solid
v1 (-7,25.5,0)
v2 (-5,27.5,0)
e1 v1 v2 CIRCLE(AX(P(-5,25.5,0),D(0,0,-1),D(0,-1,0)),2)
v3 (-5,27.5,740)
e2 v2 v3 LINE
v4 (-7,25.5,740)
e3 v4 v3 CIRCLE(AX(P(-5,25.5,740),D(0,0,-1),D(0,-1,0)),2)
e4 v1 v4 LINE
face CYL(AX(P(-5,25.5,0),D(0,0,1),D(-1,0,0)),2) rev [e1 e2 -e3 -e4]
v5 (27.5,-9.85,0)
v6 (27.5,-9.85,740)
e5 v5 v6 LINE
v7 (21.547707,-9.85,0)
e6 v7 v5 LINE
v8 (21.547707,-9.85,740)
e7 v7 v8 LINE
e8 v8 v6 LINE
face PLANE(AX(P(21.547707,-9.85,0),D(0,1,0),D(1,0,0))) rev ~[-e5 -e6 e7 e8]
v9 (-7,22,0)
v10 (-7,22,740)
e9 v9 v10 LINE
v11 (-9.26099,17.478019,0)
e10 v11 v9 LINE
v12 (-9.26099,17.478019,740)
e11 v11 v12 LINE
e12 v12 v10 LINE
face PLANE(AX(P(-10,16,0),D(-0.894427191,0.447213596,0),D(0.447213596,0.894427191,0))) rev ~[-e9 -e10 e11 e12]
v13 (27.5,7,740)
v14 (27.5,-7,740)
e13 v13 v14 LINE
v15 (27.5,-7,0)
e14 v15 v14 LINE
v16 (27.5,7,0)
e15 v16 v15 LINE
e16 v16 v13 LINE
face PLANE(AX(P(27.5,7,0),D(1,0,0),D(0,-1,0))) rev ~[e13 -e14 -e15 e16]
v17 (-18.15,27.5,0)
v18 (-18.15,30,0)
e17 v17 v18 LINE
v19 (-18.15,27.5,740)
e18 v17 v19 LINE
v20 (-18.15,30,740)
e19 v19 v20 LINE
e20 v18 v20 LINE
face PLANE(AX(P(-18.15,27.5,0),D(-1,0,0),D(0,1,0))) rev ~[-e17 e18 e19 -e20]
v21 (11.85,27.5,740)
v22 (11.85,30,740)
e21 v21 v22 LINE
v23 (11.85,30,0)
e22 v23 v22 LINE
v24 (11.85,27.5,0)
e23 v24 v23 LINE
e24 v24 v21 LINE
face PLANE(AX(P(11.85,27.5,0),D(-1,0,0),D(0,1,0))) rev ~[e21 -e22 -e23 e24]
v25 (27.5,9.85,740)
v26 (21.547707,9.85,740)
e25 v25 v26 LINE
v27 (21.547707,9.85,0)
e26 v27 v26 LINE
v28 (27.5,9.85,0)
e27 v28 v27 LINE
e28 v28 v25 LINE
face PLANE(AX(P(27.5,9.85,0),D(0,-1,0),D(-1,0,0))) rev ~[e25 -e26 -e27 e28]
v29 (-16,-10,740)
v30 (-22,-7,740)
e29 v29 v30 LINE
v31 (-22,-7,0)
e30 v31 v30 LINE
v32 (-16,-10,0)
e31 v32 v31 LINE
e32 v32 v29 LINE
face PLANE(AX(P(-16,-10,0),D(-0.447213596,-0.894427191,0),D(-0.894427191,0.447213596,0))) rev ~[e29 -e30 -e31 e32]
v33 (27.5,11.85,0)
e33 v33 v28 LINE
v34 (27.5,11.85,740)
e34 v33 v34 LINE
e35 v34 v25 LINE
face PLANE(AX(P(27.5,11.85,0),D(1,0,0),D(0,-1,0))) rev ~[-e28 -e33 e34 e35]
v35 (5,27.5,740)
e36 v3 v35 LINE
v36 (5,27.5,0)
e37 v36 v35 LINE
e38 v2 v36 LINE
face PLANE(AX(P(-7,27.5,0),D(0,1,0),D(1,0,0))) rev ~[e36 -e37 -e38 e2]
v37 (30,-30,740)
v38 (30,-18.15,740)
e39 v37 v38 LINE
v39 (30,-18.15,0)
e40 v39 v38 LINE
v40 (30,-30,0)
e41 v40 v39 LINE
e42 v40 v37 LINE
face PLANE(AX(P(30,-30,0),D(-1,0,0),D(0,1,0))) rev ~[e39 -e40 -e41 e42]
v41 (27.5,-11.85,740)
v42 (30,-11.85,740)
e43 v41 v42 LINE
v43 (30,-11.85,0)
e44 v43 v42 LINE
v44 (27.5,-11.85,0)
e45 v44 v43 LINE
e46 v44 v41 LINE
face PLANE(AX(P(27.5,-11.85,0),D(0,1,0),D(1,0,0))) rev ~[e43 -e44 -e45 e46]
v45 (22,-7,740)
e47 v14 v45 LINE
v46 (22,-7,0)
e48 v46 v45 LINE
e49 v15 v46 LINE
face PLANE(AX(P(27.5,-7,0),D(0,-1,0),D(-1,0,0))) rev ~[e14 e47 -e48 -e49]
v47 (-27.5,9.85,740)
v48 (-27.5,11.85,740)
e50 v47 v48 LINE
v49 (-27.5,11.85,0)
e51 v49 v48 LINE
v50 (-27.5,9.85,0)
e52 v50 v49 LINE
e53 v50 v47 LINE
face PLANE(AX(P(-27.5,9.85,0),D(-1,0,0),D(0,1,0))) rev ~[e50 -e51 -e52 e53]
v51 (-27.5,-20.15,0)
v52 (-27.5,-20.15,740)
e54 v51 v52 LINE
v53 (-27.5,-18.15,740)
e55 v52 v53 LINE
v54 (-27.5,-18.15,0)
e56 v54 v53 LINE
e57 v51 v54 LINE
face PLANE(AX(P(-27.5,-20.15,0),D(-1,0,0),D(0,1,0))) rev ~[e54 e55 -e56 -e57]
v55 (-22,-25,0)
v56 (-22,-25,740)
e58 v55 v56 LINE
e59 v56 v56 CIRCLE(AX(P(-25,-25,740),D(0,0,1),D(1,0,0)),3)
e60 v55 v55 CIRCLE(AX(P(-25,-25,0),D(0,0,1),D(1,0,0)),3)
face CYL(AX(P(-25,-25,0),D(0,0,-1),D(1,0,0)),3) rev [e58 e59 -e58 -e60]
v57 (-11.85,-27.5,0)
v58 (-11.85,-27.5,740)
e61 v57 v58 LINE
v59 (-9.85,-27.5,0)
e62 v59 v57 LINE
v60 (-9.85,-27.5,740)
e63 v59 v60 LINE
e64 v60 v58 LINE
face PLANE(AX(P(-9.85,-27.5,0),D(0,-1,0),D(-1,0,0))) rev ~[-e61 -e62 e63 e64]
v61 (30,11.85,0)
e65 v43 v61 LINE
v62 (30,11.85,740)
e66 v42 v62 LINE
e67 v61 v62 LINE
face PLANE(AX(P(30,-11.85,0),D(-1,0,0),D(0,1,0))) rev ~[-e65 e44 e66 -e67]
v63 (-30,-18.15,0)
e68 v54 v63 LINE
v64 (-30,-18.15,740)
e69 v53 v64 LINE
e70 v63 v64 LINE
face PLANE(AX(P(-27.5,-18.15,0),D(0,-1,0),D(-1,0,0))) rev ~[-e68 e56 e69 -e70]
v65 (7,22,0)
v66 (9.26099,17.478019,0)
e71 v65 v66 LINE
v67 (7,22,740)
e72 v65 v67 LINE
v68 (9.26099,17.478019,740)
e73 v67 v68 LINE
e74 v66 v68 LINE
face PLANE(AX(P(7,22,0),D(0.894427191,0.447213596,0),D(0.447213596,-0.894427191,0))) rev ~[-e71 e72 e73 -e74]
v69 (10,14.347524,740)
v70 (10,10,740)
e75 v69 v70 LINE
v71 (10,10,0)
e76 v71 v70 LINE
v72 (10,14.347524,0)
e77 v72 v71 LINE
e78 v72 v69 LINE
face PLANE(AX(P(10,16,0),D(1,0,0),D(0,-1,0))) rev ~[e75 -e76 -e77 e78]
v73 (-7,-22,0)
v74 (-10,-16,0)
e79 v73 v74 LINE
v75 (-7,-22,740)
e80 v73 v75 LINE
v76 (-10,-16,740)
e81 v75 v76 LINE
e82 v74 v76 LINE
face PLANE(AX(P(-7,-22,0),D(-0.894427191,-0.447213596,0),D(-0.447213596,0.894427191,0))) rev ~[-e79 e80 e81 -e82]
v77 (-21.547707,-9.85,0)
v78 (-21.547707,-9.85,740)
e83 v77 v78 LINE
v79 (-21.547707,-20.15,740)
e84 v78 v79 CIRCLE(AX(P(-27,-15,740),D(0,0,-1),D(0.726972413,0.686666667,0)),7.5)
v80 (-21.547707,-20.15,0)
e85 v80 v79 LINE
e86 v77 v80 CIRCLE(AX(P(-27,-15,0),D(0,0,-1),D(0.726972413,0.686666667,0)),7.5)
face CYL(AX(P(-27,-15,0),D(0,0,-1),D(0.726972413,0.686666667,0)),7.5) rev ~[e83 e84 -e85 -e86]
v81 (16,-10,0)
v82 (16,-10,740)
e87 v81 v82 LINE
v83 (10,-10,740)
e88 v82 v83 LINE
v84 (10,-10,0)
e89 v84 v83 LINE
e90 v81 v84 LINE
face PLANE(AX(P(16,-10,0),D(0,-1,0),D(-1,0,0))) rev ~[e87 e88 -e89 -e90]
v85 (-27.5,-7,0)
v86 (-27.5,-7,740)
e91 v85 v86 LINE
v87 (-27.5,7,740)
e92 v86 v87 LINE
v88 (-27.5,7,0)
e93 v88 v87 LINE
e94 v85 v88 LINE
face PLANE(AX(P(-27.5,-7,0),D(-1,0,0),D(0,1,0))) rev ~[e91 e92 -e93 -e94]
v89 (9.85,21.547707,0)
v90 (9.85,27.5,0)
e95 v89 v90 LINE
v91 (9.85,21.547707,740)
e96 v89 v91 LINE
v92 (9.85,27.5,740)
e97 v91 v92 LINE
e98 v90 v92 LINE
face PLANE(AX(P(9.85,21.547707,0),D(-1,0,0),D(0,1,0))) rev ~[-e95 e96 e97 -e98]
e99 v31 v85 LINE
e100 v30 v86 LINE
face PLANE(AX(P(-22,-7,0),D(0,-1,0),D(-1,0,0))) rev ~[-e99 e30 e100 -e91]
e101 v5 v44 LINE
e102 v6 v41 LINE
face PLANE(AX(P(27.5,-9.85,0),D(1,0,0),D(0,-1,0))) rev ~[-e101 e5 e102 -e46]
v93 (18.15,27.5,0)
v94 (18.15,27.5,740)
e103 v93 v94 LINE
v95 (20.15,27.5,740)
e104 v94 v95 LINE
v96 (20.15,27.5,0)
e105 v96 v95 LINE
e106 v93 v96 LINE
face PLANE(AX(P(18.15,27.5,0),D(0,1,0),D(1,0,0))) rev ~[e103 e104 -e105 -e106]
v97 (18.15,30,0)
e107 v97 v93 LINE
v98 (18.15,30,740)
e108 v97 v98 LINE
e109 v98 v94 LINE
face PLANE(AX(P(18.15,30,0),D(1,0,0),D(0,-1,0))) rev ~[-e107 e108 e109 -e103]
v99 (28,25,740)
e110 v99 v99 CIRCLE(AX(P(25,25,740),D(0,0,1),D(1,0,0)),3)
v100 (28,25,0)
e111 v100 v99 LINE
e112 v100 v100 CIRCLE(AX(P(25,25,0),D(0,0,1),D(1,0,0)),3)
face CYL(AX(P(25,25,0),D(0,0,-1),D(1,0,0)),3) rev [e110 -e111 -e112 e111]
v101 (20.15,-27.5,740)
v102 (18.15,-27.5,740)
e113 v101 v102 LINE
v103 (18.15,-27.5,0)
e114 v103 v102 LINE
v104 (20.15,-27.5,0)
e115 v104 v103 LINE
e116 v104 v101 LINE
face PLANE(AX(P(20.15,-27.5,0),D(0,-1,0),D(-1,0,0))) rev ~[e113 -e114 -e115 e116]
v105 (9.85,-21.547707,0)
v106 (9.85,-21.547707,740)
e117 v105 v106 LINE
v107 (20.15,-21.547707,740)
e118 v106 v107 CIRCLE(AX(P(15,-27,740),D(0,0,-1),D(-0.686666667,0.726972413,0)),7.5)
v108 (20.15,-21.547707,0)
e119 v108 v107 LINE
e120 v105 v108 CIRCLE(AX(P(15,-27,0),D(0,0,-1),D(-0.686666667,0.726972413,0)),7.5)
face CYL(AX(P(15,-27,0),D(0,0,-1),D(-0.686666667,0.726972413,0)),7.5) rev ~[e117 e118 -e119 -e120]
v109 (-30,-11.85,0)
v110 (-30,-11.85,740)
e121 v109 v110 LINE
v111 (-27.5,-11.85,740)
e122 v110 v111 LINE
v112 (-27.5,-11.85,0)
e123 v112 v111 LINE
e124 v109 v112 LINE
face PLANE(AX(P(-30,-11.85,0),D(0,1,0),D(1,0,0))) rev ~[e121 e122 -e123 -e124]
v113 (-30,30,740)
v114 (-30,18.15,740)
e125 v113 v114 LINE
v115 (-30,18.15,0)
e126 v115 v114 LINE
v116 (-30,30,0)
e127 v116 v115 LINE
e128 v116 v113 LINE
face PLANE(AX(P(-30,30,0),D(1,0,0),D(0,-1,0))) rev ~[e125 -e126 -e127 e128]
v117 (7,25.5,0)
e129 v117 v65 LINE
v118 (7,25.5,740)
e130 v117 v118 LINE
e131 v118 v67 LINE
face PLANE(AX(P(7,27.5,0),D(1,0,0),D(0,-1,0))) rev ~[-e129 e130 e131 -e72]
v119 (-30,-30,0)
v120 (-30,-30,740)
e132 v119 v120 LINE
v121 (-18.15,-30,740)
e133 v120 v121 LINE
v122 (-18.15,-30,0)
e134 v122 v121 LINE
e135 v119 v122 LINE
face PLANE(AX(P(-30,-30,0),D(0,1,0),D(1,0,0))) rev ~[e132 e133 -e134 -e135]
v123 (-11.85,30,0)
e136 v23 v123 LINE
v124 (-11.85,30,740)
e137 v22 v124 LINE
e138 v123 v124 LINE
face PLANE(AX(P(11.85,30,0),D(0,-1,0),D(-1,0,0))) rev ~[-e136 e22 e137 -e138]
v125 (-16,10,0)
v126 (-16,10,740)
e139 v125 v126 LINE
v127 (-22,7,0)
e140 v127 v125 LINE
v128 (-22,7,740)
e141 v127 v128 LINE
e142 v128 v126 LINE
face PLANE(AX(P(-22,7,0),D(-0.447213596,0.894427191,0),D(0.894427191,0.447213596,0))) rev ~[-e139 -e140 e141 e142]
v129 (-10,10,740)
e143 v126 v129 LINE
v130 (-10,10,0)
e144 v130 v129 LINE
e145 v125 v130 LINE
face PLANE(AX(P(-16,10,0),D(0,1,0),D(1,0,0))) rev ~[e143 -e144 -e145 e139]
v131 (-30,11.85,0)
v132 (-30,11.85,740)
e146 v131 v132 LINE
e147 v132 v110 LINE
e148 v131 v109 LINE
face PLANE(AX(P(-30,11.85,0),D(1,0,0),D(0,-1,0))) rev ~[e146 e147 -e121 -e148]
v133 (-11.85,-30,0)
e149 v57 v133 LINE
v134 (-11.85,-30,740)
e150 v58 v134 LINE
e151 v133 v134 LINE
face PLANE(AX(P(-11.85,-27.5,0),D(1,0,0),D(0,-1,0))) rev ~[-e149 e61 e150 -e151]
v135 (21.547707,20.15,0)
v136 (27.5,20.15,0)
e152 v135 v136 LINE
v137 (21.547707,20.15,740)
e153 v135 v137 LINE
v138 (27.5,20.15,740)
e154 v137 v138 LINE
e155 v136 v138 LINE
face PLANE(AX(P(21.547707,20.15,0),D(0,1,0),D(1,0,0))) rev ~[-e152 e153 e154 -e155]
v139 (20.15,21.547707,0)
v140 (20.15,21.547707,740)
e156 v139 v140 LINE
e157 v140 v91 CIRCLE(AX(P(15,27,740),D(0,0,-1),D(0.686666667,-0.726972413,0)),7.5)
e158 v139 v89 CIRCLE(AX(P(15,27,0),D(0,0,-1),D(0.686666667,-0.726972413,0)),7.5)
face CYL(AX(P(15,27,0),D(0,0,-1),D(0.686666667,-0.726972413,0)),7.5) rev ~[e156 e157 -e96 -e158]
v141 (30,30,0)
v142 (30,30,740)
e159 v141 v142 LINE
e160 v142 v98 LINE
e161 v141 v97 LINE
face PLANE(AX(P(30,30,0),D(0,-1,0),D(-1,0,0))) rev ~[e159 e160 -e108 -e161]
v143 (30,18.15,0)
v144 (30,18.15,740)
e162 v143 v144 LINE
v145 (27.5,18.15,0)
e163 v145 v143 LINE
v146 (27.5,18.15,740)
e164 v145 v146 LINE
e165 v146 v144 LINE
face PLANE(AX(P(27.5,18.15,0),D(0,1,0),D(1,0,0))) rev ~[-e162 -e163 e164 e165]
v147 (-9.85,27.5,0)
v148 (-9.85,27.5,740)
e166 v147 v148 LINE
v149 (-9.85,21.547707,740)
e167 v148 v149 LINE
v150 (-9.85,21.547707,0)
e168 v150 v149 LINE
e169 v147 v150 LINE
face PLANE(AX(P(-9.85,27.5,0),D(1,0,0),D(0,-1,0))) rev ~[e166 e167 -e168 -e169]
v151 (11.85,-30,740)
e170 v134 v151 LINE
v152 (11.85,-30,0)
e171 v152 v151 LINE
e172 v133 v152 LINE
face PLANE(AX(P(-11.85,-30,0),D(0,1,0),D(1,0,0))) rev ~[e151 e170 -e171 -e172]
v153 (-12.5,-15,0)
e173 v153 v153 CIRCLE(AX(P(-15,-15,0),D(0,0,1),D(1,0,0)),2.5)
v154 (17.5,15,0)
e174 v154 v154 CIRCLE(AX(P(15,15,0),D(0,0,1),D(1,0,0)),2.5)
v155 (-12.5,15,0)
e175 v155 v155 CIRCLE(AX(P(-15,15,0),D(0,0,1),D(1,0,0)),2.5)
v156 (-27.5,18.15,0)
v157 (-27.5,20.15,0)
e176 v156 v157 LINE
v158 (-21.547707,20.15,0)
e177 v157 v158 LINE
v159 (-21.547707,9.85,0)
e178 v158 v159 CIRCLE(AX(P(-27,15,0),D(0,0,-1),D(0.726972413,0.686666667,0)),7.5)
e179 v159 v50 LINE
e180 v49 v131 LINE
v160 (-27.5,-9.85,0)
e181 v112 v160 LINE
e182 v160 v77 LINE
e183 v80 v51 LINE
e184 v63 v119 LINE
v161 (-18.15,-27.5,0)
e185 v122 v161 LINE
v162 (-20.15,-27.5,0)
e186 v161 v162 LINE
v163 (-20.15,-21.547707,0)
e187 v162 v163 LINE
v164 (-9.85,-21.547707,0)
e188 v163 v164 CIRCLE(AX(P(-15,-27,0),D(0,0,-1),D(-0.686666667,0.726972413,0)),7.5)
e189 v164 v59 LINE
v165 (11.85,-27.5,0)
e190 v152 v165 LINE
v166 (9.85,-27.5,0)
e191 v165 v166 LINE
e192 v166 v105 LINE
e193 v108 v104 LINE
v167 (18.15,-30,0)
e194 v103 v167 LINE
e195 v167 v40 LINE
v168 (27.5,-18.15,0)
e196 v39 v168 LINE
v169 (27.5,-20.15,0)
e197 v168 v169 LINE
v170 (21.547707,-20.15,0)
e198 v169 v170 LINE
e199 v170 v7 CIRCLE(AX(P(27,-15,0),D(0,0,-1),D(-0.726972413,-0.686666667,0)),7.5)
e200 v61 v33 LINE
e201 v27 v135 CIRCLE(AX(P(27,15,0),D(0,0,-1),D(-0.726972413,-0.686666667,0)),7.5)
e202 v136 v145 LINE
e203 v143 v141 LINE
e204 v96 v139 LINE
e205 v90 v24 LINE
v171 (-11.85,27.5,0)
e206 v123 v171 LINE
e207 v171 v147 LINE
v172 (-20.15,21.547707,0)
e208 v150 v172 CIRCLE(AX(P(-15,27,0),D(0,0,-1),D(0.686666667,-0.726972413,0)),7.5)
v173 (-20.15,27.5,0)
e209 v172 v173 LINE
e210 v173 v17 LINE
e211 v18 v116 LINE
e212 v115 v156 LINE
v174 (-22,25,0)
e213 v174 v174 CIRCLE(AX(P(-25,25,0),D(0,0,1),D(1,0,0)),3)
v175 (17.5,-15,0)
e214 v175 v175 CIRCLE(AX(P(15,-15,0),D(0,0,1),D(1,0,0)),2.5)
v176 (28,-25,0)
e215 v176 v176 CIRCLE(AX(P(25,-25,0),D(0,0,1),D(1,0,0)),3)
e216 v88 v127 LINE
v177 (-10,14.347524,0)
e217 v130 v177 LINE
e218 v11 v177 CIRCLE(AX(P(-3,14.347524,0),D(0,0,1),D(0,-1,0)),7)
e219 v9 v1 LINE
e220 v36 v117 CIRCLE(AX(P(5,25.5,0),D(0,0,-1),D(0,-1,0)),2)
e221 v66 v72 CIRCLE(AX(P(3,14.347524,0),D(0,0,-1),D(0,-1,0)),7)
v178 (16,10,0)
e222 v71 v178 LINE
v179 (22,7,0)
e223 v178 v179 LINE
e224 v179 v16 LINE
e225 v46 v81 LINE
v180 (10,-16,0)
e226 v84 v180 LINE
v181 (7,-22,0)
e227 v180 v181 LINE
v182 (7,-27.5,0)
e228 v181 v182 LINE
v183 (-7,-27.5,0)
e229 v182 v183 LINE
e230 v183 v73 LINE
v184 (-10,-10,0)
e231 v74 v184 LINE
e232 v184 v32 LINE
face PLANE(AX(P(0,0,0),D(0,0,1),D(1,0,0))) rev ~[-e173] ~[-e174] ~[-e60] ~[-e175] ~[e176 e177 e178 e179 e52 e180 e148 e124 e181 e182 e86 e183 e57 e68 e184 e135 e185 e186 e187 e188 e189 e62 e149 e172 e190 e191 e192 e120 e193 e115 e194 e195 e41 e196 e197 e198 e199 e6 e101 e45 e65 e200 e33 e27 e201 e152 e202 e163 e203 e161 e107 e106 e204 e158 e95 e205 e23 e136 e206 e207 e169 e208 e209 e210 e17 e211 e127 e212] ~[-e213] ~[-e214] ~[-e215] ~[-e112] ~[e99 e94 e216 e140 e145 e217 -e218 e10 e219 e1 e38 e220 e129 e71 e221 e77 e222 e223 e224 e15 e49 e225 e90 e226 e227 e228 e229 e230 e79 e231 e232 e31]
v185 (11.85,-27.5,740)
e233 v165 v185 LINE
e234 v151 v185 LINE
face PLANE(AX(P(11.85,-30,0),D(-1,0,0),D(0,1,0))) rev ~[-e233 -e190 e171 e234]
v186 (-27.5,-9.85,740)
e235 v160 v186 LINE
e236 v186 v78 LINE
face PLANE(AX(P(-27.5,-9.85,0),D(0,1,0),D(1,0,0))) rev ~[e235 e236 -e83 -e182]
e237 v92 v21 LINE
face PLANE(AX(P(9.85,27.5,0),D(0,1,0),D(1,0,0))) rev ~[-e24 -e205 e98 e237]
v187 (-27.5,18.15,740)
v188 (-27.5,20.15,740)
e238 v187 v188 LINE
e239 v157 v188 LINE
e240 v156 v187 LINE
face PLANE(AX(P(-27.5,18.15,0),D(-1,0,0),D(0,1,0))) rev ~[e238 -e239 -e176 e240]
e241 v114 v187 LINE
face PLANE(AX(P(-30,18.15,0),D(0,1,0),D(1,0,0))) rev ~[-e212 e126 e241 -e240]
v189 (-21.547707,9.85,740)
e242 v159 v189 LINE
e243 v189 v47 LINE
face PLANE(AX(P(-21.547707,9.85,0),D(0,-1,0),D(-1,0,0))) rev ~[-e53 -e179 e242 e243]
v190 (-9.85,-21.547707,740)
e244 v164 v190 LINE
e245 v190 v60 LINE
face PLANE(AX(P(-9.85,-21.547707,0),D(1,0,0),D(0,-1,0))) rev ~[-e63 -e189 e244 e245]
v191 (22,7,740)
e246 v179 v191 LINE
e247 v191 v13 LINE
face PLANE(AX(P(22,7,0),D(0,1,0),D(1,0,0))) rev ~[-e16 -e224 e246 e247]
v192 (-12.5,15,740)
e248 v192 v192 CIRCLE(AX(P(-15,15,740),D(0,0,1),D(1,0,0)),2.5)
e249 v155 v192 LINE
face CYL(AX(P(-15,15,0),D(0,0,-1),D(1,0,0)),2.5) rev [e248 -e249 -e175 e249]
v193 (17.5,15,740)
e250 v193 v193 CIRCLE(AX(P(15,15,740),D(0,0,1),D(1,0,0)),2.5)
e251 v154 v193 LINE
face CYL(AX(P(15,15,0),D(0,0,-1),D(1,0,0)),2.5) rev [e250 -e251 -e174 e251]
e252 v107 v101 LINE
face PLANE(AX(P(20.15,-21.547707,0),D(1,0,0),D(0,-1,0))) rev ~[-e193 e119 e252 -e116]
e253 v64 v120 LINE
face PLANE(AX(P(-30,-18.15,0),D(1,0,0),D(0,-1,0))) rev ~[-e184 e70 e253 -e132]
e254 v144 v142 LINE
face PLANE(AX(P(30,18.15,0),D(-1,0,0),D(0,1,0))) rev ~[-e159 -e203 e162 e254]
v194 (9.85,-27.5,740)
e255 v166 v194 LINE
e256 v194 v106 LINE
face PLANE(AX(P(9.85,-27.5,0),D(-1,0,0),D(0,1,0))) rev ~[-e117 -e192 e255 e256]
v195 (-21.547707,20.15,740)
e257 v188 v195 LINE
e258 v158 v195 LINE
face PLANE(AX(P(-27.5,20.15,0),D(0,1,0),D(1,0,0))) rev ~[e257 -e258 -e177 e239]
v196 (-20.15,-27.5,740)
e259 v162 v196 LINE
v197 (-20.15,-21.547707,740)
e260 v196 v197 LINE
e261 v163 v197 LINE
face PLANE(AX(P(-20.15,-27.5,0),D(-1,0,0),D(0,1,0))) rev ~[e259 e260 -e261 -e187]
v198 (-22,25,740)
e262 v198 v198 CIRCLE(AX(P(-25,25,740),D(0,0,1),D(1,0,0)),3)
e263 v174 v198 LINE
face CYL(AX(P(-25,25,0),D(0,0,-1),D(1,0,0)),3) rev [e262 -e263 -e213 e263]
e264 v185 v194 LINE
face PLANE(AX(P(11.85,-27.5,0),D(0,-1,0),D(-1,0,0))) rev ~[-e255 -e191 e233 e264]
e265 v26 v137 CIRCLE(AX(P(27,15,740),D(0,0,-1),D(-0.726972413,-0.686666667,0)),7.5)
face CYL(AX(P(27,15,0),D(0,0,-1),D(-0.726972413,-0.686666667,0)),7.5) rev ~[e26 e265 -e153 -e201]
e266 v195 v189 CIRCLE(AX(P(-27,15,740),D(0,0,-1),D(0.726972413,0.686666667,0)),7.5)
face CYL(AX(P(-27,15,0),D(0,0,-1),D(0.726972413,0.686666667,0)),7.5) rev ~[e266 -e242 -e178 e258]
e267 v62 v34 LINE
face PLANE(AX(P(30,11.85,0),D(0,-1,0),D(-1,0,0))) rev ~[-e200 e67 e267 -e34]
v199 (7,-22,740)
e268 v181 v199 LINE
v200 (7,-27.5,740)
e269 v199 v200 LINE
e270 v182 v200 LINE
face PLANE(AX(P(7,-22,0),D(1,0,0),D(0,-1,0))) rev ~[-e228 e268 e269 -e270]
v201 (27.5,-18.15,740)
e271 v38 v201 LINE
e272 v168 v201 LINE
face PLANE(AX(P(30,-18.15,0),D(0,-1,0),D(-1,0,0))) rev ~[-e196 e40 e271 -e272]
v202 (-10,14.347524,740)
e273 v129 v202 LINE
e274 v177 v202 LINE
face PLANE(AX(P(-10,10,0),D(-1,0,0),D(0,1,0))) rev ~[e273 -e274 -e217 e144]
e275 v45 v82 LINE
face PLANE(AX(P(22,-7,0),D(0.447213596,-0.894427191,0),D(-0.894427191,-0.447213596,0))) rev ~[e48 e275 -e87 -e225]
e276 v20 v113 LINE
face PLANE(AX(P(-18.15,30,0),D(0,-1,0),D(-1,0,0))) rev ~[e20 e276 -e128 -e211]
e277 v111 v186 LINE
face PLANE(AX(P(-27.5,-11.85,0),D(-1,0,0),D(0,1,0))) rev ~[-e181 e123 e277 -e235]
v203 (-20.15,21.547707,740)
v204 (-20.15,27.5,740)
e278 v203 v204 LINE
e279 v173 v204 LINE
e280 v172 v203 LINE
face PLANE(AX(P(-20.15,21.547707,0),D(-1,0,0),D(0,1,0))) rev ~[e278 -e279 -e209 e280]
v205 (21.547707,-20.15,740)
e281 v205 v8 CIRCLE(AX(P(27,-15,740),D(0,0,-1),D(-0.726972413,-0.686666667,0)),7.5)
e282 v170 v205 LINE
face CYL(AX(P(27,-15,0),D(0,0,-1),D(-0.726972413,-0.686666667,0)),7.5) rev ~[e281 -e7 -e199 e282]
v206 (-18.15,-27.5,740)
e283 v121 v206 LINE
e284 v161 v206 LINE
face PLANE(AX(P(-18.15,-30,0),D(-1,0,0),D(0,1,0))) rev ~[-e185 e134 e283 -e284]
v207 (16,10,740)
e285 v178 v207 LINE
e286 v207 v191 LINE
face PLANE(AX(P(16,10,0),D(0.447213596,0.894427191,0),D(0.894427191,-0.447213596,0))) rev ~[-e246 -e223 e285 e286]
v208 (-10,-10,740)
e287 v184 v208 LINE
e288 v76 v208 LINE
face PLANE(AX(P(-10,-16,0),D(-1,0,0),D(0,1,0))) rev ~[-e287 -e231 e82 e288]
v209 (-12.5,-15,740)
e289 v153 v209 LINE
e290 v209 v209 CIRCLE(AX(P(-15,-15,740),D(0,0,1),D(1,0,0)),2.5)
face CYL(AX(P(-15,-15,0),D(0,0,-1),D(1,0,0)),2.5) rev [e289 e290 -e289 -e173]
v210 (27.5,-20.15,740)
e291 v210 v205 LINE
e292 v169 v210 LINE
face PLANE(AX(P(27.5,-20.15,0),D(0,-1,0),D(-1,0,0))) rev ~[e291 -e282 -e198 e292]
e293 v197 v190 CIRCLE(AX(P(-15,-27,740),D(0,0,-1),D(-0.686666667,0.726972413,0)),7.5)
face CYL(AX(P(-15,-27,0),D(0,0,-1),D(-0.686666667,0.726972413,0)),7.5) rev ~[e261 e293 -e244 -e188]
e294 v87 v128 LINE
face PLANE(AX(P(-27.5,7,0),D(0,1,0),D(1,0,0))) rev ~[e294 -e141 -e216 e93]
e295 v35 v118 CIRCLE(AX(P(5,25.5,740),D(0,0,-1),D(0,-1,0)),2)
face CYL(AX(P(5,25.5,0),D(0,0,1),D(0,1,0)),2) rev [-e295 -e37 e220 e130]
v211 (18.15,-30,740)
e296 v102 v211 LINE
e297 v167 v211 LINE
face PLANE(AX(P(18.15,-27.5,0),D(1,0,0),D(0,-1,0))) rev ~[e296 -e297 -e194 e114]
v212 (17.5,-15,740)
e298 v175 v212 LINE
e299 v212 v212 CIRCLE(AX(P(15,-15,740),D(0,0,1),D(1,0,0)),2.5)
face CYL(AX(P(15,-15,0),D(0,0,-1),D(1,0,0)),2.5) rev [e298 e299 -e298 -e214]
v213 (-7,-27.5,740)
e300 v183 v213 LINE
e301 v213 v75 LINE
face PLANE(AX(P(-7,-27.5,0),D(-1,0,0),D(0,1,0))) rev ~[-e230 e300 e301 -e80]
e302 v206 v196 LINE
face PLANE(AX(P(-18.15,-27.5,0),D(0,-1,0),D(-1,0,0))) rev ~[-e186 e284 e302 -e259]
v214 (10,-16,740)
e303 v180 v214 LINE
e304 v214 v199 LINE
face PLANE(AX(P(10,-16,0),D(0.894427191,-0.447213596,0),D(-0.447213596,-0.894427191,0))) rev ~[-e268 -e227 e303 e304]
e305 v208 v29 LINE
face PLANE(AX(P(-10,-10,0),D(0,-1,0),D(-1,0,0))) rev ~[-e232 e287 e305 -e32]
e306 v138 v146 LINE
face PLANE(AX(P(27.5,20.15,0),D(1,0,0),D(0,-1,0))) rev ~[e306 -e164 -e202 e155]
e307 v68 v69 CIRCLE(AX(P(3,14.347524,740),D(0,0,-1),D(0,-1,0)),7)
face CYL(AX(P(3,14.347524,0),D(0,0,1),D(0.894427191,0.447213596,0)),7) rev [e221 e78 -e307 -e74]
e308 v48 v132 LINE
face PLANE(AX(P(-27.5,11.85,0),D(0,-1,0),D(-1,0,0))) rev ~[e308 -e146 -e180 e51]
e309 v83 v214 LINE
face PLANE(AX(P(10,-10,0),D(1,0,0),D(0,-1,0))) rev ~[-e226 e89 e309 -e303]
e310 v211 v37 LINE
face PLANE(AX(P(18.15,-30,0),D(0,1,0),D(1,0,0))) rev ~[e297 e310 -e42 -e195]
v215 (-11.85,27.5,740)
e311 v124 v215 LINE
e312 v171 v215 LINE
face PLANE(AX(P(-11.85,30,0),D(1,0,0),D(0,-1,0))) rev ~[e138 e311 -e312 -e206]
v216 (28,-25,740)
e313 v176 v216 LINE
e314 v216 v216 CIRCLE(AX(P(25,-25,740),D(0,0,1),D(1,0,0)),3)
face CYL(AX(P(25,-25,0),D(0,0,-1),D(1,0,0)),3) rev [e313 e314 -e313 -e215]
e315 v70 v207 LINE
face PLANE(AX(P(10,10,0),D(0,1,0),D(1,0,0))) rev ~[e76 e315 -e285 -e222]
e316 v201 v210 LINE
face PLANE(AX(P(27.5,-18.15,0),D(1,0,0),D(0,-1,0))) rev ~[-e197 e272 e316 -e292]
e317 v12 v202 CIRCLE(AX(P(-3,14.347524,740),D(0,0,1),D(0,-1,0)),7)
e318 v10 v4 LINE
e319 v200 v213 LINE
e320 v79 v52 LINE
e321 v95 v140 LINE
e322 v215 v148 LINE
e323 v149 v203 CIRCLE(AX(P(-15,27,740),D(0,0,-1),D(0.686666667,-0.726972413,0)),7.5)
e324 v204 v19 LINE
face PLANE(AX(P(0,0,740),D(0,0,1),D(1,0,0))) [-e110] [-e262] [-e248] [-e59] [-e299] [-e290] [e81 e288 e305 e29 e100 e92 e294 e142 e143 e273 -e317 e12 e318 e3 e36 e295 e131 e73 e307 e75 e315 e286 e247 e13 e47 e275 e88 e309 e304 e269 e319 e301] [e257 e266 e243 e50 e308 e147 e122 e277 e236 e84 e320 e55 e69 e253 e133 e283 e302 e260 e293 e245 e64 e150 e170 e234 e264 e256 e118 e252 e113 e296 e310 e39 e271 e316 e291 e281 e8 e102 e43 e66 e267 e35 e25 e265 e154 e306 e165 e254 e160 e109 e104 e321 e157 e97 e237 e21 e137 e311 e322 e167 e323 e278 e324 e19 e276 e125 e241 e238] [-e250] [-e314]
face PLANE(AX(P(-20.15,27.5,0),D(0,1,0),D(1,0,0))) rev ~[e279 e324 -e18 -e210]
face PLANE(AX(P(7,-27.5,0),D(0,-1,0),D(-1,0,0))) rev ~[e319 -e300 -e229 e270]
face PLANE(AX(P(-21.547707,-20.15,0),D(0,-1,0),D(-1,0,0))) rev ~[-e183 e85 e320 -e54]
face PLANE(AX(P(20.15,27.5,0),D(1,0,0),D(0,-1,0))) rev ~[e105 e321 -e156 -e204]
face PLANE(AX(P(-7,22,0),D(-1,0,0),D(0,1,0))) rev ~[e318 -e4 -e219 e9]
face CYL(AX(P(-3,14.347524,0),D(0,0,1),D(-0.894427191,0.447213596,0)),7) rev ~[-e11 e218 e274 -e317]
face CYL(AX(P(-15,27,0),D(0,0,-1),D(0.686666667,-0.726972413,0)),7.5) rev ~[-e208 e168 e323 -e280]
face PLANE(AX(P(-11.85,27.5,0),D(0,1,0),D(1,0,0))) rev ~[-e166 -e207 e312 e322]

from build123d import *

# Parameters (mm, degrees)
F0_R     = 3
F0_R_2   = 2.5
F1_DEPTH = 740
F2_R     = 2
F3_R     = 7


# Not quite as in the source:
# - a feature names something its author has since deleted; it is built from what else it names


with BuildPart() as f1:
    # F0 (on Top) → F1 (new body)
    with BuildSketch(Plane.XY):
        with BuildLine():
            Line((18.15, -30), (30, -30))
            Line((30, -30), (30, -18.15))
            Line((30, -18.15), (27.5, -18.15))
            Line((27.5, -18.15), (27.5, -20.15))
            Line((27.5, -20.15), (21.5477069044, -20.15))
            ThreePointArc((21.5477069044, -20.15), (19.5, -15), (21.5477069044, -9.85))
            Line((21.5477069044, -9.85), (27.5, -9.85))
            Line((27.5, -9.85), (27.5, -11.85))
            Line((27.5, -11.85), (30, -11.85))
            Line((30, -11.85), (30, 11.85))
            Line((30, 11.85), (27.5, 11.85))
            Line((27.5, 11.85), (27.5, 9.85))
            Line((27.5, 9.85), (21.5477069044, 9.85))
            ThreePointArc((21.5477069044, 9.85), (19.5, 15), (21.5477069044, 20.15))
            Line((21.5477069044, 20.15), (27.5, 20.15))
            Line((27.5, 20.15), (27.5, 18.15))
            Line((27.5, 18.15), (30, 18.15))
            Line((30, 18.15), (30, 30))
            Line((30, 30), (18.15, 30))
            Line((18.15, 30), (18.15, 27.5))
            Line((18.15, 27.5), (20.15, 27.5))
            Line((20.15, 27.5), (20.15, 21.5477069044))
            ThreePointArc((20.15, 21.5477069044), (15, 19.5), (9.85, 21.5477069044))
            Line((9.85, 21.5477069044), (9.85, 27.5))
            Line((9.85, 27.5), (11.85, 27.5))
            Line((11.85, 27.5), (11.85, 30))
            Line((11.85, 30), (-11.85, 30))
            Line((-11.85, 30), (-11.85, 27.5))
            Line((-11.85, 27.5), (-9.85, 27.5))
            Line((-9.85, 27.5), (-9.85, 21.5477069044))
            ThreePointArc((-9.85, 21.5477069044), (-15, 19.5), (-20.15, 21.5477069044))
            Line((-20.15, 21.5477069044), (-20.15, 27.5))
            Line((-20.15, 27.5), (-18.15, 27.5))
            Line((-18.15, 27.5), (-18.15, 30))
            Line((-18.15, 30), (-30, 30))
            Line((-30, 30), (-30, 18.15))
            Line((-30, 18.15), (-27.5, 18.15))
            Line((-27.5, 18.15), (-27.5, 20.15))
            Line((-27.5, 20.15), (-21.5477069044, 20.15))
            ThreePointArc((-21.5477069044, 20.15), (-19.5, 15), (-21.5477069044, 9.85))
            Line((-21.5477069044, 9.85), (-27.5, 9.85))
            Line((-27.5, 9.85), (-27.5, 11.85))
            Line((-27.5, 11.85), (-30, 11.85))
            Line((-30, 11.85), (-30, -11.85))
            Line((-30, -11.85), (-27.5, -11.85))
            Line((-27.5, -11.85), (-27.5, -9.85))
            Line((-27.5, -9.85), (-21.5477069044, -9.85))
            ThreePointArc((-21.5477069044, -9.85), (-19.5, -15), (-21.5477069044, -20.15))
            Line((-21.5477069044, -20.15), (-27.5, -20.15))
            Line((-27.5, -20.15), (-27.5, -18.15))
            Line((-27.5, -18.15), (-30, -18.15))
            Line((-30, -18.15), (-30, -30))
            Line((-30, -30), (-18.15, -30))
            Line((-18.15, -30), (-18.15, -27.5))
            Line((-18.15, -27.5), (-20.15, -27.5))
            Line((-20.15, -27.5), (-20.15, -21.5477069044))
            ThreePointArc((-20.15, -21.5477069044), (-15, -19.5), (-9.85, -21.5477069044))
            Line((-9.85, -21.5477069044), (-9.85, -27.5))
            Line((-9.85, -27.5), (-11.85, -27.5))
            Line((-11.85, -27.5), (-11.85, -30))
            Line((-11.85, -30), (11.85, -30))
            Line((11.85, -30), (11.85, -27.5))
            Line((11.85, -27.5), (9.85, -27.5))
            Line((9.85, -27.5), (9.85, -21.5477069044))
            ThreePointArc((9.85, -21.5477069044), (15, -19.5), (20.15, -21.5477069044))
            Line((20.15, -21.5477069044), (20.15, -27.5))
            Line((20.15, -27.5), (18.15, -27.5))
            Line((18.15, -27.5), (18.15, -30))
        make_face()
        with Locations((-25, -25)):
            Circle(F0_R, mode=Mode.SUBTRACT)
        with Locations((-15, -15)):
            Circle(F0_R_2, mode=Mode.SUBTRACT)
        with Locations((25, -25)):
            Circle(F0_R, mode=Mode.SUBTRACT)
        with Locations((15, -15)):
            Circle(F0_R_2, mode=Mode.SUBTRACT)
        with Locations((-25, 25)):
            Circle(F0_R, mode=Mode.SUBTRACT)
        with Locations((-15, 15)):
            Circle(F0_R_2, mode=Mode.SUBTRACT)
        Polygon((-7, 22), (-7, 27.5), (0, 27.5), (7, 27.5), (7, 22), (10, 16), (10, 10), (16, 10), (22, 7), (27.5, 7), (27.5, 0), (27.5, -7), (22, -7), (16, -10), (10, -10), (10, -16), (7, -22), (7, -27.5), (0, -27.5), (-7, -27.5), (-7, -22), (-10, -16), (-10, -10), (-16, -10), (-22, -7), (-27.5, -7), (-27.5, 0), (-27.5, 7), (-22, 7), (-16, 10), (-10, 10), (-10, 16), align=None, mode=Mode.SUBTRACT)
        with Locations((15, 15)):
            Circle(F0_R_2, mode=Mode.SUBTRACT)
        with Locations((25, 25)):
            Circle(F0_R, mode=Mode.SUBTRACT)
    extrude(amount=F1_DEPTH)

    # F2
    f2_edges = [f1.edges().sort_by_distance(p)[0] for p in [
        (-7, 27.5, 370),
        (7, 27.5, 370),
    ]]
    fillet(f2_edges, radius=F2_R)

    # F3
    f3_edges = [f1.edges().sort_by_distance(p)[0] for p in [
        (-10, 16, 370),
        (10, 16, 370),
    ]]
    fillet(f3_edges, radius=F3_R)


solid = f1.part
